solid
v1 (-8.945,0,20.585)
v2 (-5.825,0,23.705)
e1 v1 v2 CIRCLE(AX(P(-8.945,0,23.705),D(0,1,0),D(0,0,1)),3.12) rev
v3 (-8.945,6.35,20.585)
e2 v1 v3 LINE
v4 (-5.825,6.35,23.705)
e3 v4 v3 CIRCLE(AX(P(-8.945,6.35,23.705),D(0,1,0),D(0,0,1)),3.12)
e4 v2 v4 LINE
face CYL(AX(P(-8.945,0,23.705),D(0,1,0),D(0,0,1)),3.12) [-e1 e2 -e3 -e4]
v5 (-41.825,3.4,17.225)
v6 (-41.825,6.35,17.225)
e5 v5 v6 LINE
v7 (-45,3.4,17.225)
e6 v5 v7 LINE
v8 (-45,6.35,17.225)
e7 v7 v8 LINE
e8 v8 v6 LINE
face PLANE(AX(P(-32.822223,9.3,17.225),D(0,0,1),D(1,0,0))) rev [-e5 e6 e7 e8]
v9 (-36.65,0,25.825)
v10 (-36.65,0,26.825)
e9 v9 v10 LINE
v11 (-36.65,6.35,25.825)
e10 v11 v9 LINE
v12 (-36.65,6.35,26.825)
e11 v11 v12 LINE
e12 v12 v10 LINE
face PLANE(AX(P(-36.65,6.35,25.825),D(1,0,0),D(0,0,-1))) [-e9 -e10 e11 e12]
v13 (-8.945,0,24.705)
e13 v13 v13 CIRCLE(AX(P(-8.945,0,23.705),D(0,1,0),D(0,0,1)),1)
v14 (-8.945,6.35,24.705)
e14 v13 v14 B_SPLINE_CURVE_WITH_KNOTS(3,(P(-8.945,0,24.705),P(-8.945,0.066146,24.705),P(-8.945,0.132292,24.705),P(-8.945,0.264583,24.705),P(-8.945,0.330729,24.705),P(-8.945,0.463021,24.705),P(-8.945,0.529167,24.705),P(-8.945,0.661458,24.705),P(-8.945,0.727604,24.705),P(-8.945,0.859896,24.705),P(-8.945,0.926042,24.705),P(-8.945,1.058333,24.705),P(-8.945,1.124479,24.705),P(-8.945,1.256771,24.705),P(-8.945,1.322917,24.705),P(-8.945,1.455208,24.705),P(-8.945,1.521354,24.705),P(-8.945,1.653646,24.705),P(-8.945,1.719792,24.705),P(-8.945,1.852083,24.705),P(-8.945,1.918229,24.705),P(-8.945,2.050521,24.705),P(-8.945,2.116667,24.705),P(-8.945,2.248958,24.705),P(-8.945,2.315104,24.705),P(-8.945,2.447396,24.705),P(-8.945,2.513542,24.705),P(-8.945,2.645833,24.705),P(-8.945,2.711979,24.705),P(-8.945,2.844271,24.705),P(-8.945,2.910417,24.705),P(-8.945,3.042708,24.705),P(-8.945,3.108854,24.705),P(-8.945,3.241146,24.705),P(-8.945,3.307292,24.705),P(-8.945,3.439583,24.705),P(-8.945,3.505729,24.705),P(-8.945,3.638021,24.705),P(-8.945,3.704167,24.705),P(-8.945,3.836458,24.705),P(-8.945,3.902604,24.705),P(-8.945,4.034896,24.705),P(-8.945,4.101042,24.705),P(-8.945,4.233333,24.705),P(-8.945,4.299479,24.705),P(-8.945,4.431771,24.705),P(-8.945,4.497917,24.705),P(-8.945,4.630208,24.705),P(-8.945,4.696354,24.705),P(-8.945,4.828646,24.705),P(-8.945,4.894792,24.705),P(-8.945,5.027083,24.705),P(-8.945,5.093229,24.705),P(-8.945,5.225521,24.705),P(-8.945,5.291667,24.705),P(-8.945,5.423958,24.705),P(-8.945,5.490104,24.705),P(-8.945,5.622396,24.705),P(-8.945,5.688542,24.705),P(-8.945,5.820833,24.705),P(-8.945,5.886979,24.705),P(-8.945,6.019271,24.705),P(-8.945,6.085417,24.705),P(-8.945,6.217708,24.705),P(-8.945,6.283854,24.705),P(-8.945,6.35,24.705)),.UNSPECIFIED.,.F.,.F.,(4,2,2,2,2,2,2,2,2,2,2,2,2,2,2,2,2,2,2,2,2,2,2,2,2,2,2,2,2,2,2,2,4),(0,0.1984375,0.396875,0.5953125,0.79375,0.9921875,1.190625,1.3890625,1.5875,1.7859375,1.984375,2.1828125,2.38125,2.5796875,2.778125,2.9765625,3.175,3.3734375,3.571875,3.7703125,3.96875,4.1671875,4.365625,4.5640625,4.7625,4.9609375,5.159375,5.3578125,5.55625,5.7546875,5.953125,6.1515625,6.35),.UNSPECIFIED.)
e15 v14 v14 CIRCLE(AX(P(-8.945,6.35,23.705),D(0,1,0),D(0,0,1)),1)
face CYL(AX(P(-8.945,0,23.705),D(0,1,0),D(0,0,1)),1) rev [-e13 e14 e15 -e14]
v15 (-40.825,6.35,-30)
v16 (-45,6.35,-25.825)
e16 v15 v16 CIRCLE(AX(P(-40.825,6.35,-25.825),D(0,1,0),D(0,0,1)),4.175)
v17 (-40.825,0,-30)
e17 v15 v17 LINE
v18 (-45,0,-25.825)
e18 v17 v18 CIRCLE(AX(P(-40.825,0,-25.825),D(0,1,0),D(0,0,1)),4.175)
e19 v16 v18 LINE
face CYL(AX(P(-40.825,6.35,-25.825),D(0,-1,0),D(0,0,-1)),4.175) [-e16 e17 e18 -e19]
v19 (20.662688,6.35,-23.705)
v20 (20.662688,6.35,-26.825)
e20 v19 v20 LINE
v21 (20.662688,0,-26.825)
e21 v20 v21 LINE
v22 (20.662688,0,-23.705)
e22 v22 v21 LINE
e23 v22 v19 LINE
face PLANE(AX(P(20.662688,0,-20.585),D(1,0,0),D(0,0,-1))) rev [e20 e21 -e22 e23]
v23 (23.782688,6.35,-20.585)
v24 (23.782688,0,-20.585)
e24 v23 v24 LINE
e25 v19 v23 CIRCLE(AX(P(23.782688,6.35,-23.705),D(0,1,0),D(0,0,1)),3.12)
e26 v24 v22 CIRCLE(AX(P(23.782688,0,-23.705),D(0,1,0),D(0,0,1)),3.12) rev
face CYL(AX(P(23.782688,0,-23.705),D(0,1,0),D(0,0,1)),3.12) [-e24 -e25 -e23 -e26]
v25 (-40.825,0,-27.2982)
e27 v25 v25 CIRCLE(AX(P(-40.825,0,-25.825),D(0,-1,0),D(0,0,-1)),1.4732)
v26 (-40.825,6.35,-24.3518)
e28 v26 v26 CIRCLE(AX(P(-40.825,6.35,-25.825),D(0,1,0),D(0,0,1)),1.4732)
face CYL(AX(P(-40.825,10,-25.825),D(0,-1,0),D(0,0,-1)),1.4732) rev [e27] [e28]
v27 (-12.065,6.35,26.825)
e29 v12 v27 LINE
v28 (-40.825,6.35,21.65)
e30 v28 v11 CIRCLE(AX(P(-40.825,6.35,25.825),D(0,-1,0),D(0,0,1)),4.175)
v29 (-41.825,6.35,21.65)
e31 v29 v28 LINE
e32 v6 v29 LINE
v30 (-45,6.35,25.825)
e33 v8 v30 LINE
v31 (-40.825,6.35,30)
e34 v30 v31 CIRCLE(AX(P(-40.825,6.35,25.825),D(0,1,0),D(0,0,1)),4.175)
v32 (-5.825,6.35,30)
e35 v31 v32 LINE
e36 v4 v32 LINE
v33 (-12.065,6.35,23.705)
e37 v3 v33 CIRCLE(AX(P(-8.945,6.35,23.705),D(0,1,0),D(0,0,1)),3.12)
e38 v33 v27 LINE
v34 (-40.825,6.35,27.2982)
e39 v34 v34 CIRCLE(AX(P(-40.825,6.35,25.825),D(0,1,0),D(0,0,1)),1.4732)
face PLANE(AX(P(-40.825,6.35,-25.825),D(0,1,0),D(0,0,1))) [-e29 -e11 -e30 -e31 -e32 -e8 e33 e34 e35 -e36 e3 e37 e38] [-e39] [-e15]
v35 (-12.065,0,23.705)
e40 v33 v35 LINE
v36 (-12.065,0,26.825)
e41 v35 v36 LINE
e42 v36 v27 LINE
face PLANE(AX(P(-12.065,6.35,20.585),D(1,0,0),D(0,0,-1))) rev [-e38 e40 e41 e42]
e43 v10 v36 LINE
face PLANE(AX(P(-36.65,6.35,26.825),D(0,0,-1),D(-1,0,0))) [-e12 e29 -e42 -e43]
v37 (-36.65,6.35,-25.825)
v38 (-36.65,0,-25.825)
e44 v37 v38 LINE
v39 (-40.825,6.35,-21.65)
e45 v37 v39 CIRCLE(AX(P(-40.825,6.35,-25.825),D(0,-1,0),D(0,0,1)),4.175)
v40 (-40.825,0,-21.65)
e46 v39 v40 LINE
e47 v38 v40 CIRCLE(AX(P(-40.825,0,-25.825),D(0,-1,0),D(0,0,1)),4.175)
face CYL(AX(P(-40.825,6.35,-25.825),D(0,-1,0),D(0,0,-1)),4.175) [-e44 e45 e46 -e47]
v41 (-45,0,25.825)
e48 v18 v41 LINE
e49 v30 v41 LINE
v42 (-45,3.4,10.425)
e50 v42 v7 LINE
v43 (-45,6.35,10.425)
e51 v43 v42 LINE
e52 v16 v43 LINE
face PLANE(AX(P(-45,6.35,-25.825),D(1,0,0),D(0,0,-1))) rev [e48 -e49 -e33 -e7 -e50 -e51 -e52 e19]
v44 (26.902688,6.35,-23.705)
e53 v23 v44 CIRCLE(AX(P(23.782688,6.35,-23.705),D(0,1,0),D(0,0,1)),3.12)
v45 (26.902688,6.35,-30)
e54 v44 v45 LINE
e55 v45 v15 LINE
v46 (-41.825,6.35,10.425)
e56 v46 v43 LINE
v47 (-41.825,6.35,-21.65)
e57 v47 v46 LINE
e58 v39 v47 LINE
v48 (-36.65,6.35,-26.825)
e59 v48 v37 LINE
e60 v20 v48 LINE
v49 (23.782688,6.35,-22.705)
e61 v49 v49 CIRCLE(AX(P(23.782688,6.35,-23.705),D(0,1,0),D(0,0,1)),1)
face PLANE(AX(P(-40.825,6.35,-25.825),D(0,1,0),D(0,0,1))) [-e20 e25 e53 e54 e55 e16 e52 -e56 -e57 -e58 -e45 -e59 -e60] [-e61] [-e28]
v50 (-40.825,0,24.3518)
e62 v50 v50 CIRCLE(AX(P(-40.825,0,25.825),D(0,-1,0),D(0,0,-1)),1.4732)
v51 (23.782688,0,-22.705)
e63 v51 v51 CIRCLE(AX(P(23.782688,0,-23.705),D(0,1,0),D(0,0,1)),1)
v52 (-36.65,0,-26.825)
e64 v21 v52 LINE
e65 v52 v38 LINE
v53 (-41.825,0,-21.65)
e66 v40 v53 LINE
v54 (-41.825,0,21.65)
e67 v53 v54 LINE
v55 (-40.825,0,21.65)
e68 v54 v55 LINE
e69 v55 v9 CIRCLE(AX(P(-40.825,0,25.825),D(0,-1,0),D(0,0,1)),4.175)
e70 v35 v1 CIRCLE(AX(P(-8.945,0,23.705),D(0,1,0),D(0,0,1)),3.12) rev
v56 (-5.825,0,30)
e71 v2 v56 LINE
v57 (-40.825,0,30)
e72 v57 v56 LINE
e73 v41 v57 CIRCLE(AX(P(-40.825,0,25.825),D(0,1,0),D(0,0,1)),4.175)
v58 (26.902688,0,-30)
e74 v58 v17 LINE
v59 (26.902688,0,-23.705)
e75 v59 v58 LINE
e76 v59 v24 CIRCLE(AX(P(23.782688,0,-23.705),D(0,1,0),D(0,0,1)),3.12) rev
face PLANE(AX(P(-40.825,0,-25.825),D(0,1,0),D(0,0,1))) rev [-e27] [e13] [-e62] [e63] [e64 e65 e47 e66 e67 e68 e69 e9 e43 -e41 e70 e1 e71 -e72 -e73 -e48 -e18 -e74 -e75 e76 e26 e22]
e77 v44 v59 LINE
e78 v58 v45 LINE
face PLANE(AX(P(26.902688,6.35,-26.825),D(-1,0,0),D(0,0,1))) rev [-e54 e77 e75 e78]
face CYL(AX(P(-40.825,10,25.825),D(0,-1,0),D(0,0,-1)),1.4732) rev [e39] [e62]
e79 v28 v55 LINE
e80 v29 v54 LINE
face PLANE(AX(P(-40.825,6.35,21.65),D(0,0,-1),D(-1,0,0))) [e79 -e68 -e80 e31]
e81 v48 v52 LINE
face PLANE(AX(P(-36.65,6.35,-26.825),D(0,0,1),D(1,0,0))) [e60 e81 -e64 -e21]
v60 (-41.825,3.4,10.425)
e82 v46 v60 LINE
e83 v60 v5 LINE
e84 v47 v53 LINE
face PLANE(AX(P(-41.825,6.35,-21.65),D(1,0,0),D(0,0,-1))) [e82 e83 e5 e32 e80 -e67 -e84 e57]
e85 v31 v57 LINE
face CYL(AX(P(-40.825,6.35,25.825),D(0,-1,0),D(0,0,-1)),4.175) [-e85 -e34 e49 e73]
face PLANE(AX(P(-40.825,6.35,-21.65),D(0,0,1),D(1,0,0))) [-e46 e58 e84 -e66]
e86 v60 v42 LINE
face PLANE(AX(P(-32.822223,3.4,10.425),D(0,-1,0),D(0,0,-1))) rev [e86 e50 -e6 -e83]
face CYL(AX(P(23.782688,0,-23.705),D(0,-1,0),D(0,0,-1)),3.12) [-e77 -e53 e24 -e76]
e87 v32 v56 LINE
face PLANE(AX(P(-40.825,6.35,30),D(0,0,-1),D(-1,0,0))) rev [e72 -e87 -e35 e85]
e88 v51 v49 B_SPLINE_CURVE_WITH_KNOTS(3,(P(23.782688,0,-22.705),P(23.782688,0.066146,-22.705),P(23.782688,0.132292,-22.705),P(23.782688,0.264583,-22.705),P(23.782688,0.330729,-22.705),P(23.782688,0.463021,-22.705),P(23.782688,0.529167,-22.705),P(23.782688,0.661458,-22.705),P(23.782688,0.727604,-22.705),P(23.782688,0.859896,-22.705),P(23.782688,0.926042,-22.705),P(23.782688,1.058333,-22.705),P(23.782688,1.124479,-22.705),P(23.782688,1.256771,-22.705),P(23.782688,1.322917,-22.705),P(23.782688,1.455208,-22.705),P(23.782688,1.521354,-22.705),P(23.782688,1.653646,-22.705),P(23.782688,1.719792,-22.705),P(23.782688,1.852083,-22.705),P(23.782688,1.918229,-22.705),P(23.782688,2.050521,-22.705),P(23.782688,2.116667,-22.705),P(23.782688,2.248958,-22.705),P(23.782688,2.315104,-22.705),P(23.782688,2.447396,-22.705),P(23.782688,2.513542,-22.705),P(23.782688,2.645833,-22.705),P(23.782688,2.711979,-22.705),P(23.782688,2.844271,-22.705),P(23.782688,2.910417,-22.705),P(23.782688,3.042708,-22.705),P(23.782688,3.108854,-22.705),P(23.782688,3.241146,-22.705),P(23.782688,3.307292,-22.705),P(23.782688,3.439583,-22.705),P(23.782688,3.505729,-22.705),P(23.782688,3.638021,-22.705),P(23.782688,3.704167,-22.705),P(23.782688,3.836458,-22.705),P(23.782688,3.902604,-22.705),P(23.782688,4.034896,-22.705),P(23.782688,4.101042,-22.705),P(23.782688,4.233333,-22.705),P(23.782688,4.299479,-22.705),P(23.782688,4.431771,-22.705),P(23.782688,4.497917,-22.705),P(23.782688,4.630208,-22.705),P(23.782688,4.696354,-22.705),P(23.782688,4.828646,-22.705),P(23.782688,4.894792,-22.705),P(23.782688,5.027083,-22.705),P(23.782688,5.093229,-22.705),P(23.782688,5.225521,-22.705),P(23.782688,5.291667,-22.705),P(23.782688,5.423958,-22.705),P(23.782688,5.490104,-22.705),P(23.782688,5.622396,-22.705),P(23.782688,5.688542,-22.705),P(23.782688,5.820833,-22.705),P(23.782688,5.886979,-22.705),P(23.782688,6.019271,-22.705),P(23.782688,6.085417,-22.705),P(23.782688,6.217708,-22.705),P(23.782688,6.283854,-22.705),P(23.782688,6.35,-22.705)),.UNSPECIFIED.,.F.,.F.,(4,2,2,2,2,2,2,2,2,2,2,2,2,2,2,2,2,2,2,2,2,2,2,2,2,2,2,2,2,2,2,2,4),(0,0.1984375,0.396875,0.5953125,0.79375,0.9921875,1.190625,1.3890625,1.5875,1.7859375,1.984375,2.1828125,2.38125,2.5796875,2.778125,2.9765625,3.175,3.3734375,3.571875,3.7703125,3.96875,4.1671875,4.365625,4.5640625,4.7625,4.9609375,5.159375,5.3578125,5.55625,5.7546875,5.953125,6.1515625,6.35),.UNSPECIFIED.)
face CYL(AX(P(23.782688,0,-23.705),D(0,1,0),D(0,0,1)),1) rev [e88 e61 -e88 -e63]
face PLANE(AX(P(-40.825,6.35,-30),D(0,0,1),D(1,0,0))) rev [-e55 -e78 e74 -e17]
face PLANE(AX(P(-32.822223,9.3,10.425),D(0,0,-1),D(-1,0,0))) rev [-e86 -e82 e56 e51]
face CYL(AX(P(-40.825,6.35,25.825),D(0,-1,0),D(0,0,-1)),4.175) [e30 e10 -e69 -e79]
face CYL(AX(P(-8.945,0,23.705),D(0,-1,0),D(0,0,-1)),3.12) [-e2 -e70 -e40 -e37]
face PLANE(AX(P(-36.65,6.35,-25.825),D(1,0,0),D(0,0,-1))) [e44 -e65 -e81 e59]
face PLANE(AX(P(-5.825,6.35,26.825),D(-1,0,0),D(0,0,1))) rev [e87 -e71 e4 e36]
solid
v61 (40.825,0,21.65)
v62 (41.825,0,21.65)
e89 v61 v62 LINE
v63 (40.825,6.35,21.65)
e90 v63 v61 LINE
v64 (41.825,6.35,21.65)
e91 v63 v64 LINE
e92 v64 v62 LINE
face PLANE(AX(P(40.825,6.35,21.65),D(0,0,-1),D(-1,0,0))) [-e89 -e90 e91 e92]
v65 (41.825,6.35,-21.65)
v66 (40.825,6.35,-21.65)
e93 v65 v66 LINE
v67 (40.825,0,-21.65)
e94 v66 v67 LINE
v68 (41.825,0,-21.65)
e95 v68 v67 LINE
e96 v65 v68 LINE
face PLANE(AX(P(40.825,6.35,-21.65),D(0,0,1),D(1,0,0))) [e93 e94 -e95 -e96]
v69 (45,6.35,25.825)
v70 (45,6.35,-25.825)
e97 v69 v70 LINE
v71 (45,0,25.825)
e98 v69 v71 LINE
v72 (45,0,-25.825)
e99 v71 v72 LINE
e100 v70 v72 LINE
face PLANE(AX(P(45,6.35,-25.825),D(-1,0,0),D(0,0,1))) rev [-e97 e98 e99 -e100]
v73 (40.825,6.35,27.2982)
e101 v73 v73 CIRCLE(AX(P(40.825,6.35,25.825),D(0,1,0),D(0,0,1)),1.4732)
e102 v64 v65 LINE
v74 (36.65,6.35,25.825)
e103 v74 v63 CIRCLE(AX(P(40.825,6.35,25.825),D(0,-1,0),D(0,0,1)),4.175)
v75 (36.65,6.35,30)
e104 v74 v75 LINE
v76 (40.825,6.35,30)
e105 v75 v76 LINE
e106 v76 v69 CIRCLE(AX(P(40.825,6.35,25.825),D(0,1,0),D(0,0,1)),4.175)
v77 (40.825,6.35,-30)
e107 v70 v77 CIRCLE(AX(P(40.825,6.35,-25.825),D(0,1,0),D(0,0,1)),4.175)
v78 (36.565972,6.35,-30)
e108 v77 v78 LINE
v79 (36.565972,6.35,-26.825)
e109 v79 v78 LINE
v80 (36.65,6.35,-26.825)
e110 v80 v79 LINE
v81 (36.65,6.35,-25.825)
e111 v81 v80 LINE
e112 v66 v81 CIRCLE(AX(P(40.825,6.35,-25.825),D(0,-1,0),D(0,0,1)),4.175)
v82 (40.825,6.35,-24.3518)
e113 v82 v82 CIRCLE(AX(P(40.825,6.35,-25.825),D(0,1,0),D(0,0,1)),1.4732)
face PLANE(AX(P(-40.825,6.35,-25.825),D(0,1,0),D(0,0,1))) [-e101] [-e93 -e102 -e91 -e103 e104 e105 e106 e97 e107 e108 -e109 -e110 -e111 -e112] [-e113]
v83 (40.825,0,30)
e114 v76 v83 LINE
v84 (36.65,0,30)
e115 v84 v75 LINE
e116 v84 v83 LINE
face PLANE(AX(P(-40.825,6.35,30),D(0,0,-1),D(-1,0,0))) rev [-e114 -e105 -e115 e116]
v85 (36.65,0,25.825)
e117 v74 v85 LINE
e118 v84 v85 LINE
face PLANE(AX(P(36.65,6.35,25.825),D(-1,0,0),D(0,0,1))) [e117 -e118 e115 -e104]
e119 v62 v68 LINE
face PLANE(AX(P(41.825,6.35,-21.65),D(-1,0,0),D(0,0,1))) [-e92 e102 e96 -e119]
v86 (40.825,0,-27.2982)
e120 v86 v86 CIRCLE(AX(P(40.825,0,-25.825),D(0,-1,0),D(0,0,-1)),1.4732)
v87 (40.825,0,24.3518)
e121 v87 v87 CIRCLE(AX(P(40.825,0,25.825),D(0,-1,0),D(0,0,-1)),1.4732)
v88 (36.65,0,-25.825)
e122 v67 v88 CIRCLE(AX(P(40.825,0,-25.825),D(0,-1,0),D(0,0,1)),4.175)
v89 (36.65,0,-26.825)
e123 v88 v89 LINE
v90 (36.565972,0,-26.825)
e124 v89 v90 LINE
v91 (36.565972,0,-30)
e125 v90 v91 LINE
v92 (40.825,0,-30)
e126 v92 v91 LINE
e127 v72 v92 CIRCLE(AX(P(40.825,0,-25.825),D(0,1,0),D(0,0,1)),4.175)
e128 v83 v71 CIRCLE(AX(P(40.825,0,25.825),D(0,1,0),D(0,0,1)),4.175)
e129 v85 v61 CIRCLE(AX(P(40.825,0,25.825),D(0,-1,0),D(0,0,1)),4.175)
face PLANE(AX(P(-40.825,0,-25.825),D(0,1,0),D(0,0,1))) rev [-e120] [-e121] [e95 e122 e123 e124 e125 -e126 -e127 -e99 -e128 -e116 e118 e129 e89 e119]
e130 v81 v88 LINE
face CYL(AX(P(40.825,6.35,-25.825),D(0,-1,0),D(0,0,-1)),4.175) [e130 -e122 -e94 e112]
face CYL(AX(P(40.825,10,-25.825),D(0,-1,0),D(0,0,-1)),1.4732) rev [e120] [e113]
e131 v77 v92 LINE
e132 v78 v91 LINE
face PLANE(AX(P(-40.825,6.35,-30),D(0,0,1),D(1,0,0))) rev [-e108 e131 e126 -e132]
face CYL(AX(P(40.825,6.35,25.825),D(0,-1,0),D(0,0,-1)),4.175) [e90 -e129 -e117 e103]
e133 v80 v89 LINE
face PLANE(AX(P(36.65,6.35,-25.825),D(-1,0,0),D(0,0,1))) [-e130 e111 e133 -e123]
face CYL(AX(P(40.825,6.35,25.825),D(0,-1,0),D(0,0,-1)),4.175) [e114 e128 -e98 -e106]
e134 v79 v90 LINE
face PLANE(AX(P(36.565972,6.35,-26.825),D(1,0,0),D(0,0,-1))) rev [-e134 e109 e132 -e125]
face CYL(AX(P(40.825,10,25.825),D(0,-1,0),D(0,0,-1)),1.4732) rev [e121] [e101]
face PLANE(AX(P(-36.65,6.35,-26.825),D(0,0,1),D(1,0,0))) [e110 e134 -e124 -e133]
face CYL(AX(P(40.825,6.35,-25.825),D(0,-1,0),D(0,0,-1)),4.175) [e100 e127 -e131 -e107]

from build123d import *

# Parameters (mm, degrees)
BOSS_EXTRUDE3_DEPTH = 6.35
SKETCH3_W           = 9.663283239
SKETCH3_H           = 6.35
CUT_EXTRUDE1_DEPTH  = 3.175
SKETCH4_W           = 42.475
SKETCH4_H           = 6.35
CUT_EXTRUDE2_DEPTH  = 8.35
SKETCH5_W           = 6.8
SKETCH5_H           = 5.9
CUT_EXTRUDE3_DEPTH  = 3.175
SKETCH7_R           = 1.4732
CUT_EXTRUDE4_DEPTH  = 10
SKETCH10_W          = 6.24
SKETCH10_H          = 6.35
BOSS_EXTRUDE4_DEPTH = 6.24
SKETCH11_W          = 6.24
SKETCH11_H          = 6.35
BOSS_EXTRUDE5_DEPTH = 6.24
SKETCH12_R          = 1
CUT_EXTRUDE5_DEPTH  = 55.454774814
SKETCH13_R          = 1
CUT_EXTRUDE6_DEPTH  = 55.454774814
FILLET1_R           = 3.12


with BuildPart() as part:
    # Sketch2 → Boss-Extrude3 (new body)
    with BuildSketch(Plane(origin=(0, 0, 0), x_dir=(1, 0, 0), z_dir=(0, 1, 0))):
        with BuildLine():
            Line((-45, 25.825), (-45, -25.825))
            ThreePointArc((-45, -25.825), (-43.777170811, -28.777170811), (-40.825, -30))
            Line((-40.825, -30), (40.825, -30))
            ThreePointArc((40.825, -30), (43.777170811, -28.777170811), (45, -25.825))
            Line((45, -25.825), (45, 25.825))
            ThreePointArc((45, 25.825), (43.777170811, 28.777170811), (40.825, 30))
            Line((40.825, 30), (-40.825, 30))
            ThreePointArc((-40.825, 30), (-43.777170811, 28.777170811), (-45, 25.825))
        make_face()
        with BuildLine():
            Line((40.825, 21.65), (41.825, 21.65))
            Line((41.825, 21.65), (41.825, -21.65))
            Line((41.825, -21.65), (40.825, -21.65))
            ThreePointArc((40.825, -21.65), (37.872829189, -22.872829189), (36.65, -25.825))
            Line((36.65, -25.825), (36.65, -26.825))
            Line((36.65, -26.825), (-36.65, -26.825))
            Line((-36.65, -26.825), (-36.65, -25.825))
            ThreePointArc((-36.65, -25.825), (-37.872829189, -22.872829189), (-40.825, -21.65))
            Line((-40.825, -21.65), (-41.825, -21.65))
            Line((-41.825, -21.65), (-41.825, 21.65))
            Line((-41.825, 21.65), (-40.825, 21.65))
            ThreePointArc((-40.825, 21.65), (-37.872829189, 22.872829189), (-36.65, 25.825))
            Line((-36.65, 25.825), (-36.65, 26.825))
            Line((-36.65, 26.825), (36.65, 26.825))
            Line((36.65, 26.825), (36.65, 25.825))
            ThreePointArc((36.65, 25.825), (37.872829189, 22.872829189), (40.825, 21.65))
        make_face(mode=Mode.SUBTRACT)
    extrude(amount=BOSS_EXTRUDE3_DEPTH)

    # Sketch3 → Cut-Extrude1 (cut)
    with BuildSketch(Plane(origin=(0, 0, -30), x_dir=(-1, 0, 0), z_dir=(0, 0, -1))):
        with Locations((-31.734329903, 3.175)):
            Rectangle(SKETCH3_W, SKETCH3_H)
    extrude(amount=-CUT_EXTRUDE1_DEPTH, mode=Mode.SUBTRACT)

    # Sketch4 → Cut-Extrude2 (cut)
    with BuildSketch(Plane.XY.offset(30)):
        with Locations((15.4125, 3.175)):
            Rectangle(SKETCH4_W, SKETCH4_H)
    extrude(amount=-CUT_EXTRUDE2_DEPTH, mode=Mode.SUBTRACT)


with BuildPart() as cut_extrude2_piece_1:
    # of the separate pieces the step leaves, piece 1, a body of its own (cut_extrude2_pieces)
    add(part.part.solids().sort_by_distance((-40.825, 0, 30))[0])

    # Sketch5 → Cut-Extrude3 (cut)
    with BuildSketch(Plane.ZY.offset(45)):
        with Locations((13.825, 6.35)):
            Rectangle(SKETCH5_W, SKETCH5_H)
    extrude(amount=-CUT_EXTRUDE3_DEPTH, mode=Mode.SUBTRACT)


with BuildPart() as cut_extrude2_piece_2:
    # of the separate pieces the step leaves, piece 2, a body of its own (cut_extrude2_pieces)
    add(part.part.solids().sort_by_distance((40.825, 0, -30))[0])


with BuildPart() as cut_extrude4_tool:
    # Sketch7 → Cut-Extrude4 (new body)
    with BuildSketch(Plane.XZ):
        with Locations(Location((-40.825, -25.825, 0), (0, 0, 270))):
            Circle(SKETCH7_R)
        with Locations(Location((-40.825, 25.825, 0), (0, 0, 270))):
            Circle(SKETCH7_R)
        with Locations(Location((40.825, 25.825, 0), (0, 0, 270))):
            Circle(SKETCH7_R)
        with Locations(Location((40.825, -25.825, 0), (0, 0, 270))):
            Circle(SKETCH7_R)
    extrude(amount=-CUT_EXTRUDE4_DEPTH)


with BuildPart() as cut_extrude2_piece_1_1:
    add(cut_extrude2_piece_1.part)

    # Cut-Extrude4: cut by cut_extrude4_tool
    add(cut_extrude4_tool.part, mode=Mode.SUBTRACT)

    # Sketch10 → Boss-Extrude4 (add)
    with BuildSketch(Plane(origin=(0, 0, 26.825), x_dir=(-1, 0, 0), z_dir=(0, 0, -1))):
        with Locations((8.945, 3.175)):
            Rectangle(SKETCH10_W, SKETCH10_H)
    extrude(amount=BOSS_EXTRUDE4_DEPTH)

    # Sketch11 → Boss-Extrude5 (add)
    with BuildSketch(Plane.XY.offset(-26.825)):
        with Locations((23.782688283, 3.175)):
            Rectangle(SKETCH11_W, SKETCH11_H)
    extrude(amount=BOSS_EXTRUDE5_DEPTH)

    # Sketch12 → Cut-Extrude5 (cut, through all)
    with BuildSketch(Plane(origin=(0, 6.35, 0), x_dir=(1, 0, 0), z_dir=(0, 1, 0))):
        with Locations(Location((23.782688283, 23.705, 0), (0, 0, 270))):
            Circle(SKETCH12_R)
    extrude(amount=-CUT_EXTRUDE5_DEPTH, mode=Mode.SUBTRACT)

    # Sketch13 → Cut-Extrude6 (cut, through all)
    with BuildSketch(Plane(origin=(0, 6.35, 0), x_dir=(1, 0, 0), z_dir=(0, 1, 0))):
        with Locations(Location((-8.945, -23.705, 0), (0, 0, 270))):
            Circle(SKETCH13_R)
    extrude(amount=-CUT_EXTRUDE6_DEPTH, mode=Mode.SUBTRACT)

    # Fillet1
    fillet1_edges = [cut_extrude2_piece_1_1.edges().sort_by_distance(p)[0] for p in [
        (26.902688283, 3.175, -20.585),
        (20.662688283, 3.175, -20.585),
        (-5.825, 3.175, 20.585),
        (-12.065, 3.175, 20.585),
    ]]
    fillet(fillet1_edges, radius=FILLET1_R - 0.0001)  # a hair under: the kernel refuses the full size


with BuildPart() as cut_extrude2_piece_2_1:
    add(cut_extrude2_piece_2.part)

    # Cut-Extrude4: cut by cut_extrude4_tool
    add(cut_extrude4_tool.part, mode=Mode.SUBTRACT)


solid = Compound([cut_extrude2_piece_1_1.part, cut_extrude2_piece_2_1.part])
